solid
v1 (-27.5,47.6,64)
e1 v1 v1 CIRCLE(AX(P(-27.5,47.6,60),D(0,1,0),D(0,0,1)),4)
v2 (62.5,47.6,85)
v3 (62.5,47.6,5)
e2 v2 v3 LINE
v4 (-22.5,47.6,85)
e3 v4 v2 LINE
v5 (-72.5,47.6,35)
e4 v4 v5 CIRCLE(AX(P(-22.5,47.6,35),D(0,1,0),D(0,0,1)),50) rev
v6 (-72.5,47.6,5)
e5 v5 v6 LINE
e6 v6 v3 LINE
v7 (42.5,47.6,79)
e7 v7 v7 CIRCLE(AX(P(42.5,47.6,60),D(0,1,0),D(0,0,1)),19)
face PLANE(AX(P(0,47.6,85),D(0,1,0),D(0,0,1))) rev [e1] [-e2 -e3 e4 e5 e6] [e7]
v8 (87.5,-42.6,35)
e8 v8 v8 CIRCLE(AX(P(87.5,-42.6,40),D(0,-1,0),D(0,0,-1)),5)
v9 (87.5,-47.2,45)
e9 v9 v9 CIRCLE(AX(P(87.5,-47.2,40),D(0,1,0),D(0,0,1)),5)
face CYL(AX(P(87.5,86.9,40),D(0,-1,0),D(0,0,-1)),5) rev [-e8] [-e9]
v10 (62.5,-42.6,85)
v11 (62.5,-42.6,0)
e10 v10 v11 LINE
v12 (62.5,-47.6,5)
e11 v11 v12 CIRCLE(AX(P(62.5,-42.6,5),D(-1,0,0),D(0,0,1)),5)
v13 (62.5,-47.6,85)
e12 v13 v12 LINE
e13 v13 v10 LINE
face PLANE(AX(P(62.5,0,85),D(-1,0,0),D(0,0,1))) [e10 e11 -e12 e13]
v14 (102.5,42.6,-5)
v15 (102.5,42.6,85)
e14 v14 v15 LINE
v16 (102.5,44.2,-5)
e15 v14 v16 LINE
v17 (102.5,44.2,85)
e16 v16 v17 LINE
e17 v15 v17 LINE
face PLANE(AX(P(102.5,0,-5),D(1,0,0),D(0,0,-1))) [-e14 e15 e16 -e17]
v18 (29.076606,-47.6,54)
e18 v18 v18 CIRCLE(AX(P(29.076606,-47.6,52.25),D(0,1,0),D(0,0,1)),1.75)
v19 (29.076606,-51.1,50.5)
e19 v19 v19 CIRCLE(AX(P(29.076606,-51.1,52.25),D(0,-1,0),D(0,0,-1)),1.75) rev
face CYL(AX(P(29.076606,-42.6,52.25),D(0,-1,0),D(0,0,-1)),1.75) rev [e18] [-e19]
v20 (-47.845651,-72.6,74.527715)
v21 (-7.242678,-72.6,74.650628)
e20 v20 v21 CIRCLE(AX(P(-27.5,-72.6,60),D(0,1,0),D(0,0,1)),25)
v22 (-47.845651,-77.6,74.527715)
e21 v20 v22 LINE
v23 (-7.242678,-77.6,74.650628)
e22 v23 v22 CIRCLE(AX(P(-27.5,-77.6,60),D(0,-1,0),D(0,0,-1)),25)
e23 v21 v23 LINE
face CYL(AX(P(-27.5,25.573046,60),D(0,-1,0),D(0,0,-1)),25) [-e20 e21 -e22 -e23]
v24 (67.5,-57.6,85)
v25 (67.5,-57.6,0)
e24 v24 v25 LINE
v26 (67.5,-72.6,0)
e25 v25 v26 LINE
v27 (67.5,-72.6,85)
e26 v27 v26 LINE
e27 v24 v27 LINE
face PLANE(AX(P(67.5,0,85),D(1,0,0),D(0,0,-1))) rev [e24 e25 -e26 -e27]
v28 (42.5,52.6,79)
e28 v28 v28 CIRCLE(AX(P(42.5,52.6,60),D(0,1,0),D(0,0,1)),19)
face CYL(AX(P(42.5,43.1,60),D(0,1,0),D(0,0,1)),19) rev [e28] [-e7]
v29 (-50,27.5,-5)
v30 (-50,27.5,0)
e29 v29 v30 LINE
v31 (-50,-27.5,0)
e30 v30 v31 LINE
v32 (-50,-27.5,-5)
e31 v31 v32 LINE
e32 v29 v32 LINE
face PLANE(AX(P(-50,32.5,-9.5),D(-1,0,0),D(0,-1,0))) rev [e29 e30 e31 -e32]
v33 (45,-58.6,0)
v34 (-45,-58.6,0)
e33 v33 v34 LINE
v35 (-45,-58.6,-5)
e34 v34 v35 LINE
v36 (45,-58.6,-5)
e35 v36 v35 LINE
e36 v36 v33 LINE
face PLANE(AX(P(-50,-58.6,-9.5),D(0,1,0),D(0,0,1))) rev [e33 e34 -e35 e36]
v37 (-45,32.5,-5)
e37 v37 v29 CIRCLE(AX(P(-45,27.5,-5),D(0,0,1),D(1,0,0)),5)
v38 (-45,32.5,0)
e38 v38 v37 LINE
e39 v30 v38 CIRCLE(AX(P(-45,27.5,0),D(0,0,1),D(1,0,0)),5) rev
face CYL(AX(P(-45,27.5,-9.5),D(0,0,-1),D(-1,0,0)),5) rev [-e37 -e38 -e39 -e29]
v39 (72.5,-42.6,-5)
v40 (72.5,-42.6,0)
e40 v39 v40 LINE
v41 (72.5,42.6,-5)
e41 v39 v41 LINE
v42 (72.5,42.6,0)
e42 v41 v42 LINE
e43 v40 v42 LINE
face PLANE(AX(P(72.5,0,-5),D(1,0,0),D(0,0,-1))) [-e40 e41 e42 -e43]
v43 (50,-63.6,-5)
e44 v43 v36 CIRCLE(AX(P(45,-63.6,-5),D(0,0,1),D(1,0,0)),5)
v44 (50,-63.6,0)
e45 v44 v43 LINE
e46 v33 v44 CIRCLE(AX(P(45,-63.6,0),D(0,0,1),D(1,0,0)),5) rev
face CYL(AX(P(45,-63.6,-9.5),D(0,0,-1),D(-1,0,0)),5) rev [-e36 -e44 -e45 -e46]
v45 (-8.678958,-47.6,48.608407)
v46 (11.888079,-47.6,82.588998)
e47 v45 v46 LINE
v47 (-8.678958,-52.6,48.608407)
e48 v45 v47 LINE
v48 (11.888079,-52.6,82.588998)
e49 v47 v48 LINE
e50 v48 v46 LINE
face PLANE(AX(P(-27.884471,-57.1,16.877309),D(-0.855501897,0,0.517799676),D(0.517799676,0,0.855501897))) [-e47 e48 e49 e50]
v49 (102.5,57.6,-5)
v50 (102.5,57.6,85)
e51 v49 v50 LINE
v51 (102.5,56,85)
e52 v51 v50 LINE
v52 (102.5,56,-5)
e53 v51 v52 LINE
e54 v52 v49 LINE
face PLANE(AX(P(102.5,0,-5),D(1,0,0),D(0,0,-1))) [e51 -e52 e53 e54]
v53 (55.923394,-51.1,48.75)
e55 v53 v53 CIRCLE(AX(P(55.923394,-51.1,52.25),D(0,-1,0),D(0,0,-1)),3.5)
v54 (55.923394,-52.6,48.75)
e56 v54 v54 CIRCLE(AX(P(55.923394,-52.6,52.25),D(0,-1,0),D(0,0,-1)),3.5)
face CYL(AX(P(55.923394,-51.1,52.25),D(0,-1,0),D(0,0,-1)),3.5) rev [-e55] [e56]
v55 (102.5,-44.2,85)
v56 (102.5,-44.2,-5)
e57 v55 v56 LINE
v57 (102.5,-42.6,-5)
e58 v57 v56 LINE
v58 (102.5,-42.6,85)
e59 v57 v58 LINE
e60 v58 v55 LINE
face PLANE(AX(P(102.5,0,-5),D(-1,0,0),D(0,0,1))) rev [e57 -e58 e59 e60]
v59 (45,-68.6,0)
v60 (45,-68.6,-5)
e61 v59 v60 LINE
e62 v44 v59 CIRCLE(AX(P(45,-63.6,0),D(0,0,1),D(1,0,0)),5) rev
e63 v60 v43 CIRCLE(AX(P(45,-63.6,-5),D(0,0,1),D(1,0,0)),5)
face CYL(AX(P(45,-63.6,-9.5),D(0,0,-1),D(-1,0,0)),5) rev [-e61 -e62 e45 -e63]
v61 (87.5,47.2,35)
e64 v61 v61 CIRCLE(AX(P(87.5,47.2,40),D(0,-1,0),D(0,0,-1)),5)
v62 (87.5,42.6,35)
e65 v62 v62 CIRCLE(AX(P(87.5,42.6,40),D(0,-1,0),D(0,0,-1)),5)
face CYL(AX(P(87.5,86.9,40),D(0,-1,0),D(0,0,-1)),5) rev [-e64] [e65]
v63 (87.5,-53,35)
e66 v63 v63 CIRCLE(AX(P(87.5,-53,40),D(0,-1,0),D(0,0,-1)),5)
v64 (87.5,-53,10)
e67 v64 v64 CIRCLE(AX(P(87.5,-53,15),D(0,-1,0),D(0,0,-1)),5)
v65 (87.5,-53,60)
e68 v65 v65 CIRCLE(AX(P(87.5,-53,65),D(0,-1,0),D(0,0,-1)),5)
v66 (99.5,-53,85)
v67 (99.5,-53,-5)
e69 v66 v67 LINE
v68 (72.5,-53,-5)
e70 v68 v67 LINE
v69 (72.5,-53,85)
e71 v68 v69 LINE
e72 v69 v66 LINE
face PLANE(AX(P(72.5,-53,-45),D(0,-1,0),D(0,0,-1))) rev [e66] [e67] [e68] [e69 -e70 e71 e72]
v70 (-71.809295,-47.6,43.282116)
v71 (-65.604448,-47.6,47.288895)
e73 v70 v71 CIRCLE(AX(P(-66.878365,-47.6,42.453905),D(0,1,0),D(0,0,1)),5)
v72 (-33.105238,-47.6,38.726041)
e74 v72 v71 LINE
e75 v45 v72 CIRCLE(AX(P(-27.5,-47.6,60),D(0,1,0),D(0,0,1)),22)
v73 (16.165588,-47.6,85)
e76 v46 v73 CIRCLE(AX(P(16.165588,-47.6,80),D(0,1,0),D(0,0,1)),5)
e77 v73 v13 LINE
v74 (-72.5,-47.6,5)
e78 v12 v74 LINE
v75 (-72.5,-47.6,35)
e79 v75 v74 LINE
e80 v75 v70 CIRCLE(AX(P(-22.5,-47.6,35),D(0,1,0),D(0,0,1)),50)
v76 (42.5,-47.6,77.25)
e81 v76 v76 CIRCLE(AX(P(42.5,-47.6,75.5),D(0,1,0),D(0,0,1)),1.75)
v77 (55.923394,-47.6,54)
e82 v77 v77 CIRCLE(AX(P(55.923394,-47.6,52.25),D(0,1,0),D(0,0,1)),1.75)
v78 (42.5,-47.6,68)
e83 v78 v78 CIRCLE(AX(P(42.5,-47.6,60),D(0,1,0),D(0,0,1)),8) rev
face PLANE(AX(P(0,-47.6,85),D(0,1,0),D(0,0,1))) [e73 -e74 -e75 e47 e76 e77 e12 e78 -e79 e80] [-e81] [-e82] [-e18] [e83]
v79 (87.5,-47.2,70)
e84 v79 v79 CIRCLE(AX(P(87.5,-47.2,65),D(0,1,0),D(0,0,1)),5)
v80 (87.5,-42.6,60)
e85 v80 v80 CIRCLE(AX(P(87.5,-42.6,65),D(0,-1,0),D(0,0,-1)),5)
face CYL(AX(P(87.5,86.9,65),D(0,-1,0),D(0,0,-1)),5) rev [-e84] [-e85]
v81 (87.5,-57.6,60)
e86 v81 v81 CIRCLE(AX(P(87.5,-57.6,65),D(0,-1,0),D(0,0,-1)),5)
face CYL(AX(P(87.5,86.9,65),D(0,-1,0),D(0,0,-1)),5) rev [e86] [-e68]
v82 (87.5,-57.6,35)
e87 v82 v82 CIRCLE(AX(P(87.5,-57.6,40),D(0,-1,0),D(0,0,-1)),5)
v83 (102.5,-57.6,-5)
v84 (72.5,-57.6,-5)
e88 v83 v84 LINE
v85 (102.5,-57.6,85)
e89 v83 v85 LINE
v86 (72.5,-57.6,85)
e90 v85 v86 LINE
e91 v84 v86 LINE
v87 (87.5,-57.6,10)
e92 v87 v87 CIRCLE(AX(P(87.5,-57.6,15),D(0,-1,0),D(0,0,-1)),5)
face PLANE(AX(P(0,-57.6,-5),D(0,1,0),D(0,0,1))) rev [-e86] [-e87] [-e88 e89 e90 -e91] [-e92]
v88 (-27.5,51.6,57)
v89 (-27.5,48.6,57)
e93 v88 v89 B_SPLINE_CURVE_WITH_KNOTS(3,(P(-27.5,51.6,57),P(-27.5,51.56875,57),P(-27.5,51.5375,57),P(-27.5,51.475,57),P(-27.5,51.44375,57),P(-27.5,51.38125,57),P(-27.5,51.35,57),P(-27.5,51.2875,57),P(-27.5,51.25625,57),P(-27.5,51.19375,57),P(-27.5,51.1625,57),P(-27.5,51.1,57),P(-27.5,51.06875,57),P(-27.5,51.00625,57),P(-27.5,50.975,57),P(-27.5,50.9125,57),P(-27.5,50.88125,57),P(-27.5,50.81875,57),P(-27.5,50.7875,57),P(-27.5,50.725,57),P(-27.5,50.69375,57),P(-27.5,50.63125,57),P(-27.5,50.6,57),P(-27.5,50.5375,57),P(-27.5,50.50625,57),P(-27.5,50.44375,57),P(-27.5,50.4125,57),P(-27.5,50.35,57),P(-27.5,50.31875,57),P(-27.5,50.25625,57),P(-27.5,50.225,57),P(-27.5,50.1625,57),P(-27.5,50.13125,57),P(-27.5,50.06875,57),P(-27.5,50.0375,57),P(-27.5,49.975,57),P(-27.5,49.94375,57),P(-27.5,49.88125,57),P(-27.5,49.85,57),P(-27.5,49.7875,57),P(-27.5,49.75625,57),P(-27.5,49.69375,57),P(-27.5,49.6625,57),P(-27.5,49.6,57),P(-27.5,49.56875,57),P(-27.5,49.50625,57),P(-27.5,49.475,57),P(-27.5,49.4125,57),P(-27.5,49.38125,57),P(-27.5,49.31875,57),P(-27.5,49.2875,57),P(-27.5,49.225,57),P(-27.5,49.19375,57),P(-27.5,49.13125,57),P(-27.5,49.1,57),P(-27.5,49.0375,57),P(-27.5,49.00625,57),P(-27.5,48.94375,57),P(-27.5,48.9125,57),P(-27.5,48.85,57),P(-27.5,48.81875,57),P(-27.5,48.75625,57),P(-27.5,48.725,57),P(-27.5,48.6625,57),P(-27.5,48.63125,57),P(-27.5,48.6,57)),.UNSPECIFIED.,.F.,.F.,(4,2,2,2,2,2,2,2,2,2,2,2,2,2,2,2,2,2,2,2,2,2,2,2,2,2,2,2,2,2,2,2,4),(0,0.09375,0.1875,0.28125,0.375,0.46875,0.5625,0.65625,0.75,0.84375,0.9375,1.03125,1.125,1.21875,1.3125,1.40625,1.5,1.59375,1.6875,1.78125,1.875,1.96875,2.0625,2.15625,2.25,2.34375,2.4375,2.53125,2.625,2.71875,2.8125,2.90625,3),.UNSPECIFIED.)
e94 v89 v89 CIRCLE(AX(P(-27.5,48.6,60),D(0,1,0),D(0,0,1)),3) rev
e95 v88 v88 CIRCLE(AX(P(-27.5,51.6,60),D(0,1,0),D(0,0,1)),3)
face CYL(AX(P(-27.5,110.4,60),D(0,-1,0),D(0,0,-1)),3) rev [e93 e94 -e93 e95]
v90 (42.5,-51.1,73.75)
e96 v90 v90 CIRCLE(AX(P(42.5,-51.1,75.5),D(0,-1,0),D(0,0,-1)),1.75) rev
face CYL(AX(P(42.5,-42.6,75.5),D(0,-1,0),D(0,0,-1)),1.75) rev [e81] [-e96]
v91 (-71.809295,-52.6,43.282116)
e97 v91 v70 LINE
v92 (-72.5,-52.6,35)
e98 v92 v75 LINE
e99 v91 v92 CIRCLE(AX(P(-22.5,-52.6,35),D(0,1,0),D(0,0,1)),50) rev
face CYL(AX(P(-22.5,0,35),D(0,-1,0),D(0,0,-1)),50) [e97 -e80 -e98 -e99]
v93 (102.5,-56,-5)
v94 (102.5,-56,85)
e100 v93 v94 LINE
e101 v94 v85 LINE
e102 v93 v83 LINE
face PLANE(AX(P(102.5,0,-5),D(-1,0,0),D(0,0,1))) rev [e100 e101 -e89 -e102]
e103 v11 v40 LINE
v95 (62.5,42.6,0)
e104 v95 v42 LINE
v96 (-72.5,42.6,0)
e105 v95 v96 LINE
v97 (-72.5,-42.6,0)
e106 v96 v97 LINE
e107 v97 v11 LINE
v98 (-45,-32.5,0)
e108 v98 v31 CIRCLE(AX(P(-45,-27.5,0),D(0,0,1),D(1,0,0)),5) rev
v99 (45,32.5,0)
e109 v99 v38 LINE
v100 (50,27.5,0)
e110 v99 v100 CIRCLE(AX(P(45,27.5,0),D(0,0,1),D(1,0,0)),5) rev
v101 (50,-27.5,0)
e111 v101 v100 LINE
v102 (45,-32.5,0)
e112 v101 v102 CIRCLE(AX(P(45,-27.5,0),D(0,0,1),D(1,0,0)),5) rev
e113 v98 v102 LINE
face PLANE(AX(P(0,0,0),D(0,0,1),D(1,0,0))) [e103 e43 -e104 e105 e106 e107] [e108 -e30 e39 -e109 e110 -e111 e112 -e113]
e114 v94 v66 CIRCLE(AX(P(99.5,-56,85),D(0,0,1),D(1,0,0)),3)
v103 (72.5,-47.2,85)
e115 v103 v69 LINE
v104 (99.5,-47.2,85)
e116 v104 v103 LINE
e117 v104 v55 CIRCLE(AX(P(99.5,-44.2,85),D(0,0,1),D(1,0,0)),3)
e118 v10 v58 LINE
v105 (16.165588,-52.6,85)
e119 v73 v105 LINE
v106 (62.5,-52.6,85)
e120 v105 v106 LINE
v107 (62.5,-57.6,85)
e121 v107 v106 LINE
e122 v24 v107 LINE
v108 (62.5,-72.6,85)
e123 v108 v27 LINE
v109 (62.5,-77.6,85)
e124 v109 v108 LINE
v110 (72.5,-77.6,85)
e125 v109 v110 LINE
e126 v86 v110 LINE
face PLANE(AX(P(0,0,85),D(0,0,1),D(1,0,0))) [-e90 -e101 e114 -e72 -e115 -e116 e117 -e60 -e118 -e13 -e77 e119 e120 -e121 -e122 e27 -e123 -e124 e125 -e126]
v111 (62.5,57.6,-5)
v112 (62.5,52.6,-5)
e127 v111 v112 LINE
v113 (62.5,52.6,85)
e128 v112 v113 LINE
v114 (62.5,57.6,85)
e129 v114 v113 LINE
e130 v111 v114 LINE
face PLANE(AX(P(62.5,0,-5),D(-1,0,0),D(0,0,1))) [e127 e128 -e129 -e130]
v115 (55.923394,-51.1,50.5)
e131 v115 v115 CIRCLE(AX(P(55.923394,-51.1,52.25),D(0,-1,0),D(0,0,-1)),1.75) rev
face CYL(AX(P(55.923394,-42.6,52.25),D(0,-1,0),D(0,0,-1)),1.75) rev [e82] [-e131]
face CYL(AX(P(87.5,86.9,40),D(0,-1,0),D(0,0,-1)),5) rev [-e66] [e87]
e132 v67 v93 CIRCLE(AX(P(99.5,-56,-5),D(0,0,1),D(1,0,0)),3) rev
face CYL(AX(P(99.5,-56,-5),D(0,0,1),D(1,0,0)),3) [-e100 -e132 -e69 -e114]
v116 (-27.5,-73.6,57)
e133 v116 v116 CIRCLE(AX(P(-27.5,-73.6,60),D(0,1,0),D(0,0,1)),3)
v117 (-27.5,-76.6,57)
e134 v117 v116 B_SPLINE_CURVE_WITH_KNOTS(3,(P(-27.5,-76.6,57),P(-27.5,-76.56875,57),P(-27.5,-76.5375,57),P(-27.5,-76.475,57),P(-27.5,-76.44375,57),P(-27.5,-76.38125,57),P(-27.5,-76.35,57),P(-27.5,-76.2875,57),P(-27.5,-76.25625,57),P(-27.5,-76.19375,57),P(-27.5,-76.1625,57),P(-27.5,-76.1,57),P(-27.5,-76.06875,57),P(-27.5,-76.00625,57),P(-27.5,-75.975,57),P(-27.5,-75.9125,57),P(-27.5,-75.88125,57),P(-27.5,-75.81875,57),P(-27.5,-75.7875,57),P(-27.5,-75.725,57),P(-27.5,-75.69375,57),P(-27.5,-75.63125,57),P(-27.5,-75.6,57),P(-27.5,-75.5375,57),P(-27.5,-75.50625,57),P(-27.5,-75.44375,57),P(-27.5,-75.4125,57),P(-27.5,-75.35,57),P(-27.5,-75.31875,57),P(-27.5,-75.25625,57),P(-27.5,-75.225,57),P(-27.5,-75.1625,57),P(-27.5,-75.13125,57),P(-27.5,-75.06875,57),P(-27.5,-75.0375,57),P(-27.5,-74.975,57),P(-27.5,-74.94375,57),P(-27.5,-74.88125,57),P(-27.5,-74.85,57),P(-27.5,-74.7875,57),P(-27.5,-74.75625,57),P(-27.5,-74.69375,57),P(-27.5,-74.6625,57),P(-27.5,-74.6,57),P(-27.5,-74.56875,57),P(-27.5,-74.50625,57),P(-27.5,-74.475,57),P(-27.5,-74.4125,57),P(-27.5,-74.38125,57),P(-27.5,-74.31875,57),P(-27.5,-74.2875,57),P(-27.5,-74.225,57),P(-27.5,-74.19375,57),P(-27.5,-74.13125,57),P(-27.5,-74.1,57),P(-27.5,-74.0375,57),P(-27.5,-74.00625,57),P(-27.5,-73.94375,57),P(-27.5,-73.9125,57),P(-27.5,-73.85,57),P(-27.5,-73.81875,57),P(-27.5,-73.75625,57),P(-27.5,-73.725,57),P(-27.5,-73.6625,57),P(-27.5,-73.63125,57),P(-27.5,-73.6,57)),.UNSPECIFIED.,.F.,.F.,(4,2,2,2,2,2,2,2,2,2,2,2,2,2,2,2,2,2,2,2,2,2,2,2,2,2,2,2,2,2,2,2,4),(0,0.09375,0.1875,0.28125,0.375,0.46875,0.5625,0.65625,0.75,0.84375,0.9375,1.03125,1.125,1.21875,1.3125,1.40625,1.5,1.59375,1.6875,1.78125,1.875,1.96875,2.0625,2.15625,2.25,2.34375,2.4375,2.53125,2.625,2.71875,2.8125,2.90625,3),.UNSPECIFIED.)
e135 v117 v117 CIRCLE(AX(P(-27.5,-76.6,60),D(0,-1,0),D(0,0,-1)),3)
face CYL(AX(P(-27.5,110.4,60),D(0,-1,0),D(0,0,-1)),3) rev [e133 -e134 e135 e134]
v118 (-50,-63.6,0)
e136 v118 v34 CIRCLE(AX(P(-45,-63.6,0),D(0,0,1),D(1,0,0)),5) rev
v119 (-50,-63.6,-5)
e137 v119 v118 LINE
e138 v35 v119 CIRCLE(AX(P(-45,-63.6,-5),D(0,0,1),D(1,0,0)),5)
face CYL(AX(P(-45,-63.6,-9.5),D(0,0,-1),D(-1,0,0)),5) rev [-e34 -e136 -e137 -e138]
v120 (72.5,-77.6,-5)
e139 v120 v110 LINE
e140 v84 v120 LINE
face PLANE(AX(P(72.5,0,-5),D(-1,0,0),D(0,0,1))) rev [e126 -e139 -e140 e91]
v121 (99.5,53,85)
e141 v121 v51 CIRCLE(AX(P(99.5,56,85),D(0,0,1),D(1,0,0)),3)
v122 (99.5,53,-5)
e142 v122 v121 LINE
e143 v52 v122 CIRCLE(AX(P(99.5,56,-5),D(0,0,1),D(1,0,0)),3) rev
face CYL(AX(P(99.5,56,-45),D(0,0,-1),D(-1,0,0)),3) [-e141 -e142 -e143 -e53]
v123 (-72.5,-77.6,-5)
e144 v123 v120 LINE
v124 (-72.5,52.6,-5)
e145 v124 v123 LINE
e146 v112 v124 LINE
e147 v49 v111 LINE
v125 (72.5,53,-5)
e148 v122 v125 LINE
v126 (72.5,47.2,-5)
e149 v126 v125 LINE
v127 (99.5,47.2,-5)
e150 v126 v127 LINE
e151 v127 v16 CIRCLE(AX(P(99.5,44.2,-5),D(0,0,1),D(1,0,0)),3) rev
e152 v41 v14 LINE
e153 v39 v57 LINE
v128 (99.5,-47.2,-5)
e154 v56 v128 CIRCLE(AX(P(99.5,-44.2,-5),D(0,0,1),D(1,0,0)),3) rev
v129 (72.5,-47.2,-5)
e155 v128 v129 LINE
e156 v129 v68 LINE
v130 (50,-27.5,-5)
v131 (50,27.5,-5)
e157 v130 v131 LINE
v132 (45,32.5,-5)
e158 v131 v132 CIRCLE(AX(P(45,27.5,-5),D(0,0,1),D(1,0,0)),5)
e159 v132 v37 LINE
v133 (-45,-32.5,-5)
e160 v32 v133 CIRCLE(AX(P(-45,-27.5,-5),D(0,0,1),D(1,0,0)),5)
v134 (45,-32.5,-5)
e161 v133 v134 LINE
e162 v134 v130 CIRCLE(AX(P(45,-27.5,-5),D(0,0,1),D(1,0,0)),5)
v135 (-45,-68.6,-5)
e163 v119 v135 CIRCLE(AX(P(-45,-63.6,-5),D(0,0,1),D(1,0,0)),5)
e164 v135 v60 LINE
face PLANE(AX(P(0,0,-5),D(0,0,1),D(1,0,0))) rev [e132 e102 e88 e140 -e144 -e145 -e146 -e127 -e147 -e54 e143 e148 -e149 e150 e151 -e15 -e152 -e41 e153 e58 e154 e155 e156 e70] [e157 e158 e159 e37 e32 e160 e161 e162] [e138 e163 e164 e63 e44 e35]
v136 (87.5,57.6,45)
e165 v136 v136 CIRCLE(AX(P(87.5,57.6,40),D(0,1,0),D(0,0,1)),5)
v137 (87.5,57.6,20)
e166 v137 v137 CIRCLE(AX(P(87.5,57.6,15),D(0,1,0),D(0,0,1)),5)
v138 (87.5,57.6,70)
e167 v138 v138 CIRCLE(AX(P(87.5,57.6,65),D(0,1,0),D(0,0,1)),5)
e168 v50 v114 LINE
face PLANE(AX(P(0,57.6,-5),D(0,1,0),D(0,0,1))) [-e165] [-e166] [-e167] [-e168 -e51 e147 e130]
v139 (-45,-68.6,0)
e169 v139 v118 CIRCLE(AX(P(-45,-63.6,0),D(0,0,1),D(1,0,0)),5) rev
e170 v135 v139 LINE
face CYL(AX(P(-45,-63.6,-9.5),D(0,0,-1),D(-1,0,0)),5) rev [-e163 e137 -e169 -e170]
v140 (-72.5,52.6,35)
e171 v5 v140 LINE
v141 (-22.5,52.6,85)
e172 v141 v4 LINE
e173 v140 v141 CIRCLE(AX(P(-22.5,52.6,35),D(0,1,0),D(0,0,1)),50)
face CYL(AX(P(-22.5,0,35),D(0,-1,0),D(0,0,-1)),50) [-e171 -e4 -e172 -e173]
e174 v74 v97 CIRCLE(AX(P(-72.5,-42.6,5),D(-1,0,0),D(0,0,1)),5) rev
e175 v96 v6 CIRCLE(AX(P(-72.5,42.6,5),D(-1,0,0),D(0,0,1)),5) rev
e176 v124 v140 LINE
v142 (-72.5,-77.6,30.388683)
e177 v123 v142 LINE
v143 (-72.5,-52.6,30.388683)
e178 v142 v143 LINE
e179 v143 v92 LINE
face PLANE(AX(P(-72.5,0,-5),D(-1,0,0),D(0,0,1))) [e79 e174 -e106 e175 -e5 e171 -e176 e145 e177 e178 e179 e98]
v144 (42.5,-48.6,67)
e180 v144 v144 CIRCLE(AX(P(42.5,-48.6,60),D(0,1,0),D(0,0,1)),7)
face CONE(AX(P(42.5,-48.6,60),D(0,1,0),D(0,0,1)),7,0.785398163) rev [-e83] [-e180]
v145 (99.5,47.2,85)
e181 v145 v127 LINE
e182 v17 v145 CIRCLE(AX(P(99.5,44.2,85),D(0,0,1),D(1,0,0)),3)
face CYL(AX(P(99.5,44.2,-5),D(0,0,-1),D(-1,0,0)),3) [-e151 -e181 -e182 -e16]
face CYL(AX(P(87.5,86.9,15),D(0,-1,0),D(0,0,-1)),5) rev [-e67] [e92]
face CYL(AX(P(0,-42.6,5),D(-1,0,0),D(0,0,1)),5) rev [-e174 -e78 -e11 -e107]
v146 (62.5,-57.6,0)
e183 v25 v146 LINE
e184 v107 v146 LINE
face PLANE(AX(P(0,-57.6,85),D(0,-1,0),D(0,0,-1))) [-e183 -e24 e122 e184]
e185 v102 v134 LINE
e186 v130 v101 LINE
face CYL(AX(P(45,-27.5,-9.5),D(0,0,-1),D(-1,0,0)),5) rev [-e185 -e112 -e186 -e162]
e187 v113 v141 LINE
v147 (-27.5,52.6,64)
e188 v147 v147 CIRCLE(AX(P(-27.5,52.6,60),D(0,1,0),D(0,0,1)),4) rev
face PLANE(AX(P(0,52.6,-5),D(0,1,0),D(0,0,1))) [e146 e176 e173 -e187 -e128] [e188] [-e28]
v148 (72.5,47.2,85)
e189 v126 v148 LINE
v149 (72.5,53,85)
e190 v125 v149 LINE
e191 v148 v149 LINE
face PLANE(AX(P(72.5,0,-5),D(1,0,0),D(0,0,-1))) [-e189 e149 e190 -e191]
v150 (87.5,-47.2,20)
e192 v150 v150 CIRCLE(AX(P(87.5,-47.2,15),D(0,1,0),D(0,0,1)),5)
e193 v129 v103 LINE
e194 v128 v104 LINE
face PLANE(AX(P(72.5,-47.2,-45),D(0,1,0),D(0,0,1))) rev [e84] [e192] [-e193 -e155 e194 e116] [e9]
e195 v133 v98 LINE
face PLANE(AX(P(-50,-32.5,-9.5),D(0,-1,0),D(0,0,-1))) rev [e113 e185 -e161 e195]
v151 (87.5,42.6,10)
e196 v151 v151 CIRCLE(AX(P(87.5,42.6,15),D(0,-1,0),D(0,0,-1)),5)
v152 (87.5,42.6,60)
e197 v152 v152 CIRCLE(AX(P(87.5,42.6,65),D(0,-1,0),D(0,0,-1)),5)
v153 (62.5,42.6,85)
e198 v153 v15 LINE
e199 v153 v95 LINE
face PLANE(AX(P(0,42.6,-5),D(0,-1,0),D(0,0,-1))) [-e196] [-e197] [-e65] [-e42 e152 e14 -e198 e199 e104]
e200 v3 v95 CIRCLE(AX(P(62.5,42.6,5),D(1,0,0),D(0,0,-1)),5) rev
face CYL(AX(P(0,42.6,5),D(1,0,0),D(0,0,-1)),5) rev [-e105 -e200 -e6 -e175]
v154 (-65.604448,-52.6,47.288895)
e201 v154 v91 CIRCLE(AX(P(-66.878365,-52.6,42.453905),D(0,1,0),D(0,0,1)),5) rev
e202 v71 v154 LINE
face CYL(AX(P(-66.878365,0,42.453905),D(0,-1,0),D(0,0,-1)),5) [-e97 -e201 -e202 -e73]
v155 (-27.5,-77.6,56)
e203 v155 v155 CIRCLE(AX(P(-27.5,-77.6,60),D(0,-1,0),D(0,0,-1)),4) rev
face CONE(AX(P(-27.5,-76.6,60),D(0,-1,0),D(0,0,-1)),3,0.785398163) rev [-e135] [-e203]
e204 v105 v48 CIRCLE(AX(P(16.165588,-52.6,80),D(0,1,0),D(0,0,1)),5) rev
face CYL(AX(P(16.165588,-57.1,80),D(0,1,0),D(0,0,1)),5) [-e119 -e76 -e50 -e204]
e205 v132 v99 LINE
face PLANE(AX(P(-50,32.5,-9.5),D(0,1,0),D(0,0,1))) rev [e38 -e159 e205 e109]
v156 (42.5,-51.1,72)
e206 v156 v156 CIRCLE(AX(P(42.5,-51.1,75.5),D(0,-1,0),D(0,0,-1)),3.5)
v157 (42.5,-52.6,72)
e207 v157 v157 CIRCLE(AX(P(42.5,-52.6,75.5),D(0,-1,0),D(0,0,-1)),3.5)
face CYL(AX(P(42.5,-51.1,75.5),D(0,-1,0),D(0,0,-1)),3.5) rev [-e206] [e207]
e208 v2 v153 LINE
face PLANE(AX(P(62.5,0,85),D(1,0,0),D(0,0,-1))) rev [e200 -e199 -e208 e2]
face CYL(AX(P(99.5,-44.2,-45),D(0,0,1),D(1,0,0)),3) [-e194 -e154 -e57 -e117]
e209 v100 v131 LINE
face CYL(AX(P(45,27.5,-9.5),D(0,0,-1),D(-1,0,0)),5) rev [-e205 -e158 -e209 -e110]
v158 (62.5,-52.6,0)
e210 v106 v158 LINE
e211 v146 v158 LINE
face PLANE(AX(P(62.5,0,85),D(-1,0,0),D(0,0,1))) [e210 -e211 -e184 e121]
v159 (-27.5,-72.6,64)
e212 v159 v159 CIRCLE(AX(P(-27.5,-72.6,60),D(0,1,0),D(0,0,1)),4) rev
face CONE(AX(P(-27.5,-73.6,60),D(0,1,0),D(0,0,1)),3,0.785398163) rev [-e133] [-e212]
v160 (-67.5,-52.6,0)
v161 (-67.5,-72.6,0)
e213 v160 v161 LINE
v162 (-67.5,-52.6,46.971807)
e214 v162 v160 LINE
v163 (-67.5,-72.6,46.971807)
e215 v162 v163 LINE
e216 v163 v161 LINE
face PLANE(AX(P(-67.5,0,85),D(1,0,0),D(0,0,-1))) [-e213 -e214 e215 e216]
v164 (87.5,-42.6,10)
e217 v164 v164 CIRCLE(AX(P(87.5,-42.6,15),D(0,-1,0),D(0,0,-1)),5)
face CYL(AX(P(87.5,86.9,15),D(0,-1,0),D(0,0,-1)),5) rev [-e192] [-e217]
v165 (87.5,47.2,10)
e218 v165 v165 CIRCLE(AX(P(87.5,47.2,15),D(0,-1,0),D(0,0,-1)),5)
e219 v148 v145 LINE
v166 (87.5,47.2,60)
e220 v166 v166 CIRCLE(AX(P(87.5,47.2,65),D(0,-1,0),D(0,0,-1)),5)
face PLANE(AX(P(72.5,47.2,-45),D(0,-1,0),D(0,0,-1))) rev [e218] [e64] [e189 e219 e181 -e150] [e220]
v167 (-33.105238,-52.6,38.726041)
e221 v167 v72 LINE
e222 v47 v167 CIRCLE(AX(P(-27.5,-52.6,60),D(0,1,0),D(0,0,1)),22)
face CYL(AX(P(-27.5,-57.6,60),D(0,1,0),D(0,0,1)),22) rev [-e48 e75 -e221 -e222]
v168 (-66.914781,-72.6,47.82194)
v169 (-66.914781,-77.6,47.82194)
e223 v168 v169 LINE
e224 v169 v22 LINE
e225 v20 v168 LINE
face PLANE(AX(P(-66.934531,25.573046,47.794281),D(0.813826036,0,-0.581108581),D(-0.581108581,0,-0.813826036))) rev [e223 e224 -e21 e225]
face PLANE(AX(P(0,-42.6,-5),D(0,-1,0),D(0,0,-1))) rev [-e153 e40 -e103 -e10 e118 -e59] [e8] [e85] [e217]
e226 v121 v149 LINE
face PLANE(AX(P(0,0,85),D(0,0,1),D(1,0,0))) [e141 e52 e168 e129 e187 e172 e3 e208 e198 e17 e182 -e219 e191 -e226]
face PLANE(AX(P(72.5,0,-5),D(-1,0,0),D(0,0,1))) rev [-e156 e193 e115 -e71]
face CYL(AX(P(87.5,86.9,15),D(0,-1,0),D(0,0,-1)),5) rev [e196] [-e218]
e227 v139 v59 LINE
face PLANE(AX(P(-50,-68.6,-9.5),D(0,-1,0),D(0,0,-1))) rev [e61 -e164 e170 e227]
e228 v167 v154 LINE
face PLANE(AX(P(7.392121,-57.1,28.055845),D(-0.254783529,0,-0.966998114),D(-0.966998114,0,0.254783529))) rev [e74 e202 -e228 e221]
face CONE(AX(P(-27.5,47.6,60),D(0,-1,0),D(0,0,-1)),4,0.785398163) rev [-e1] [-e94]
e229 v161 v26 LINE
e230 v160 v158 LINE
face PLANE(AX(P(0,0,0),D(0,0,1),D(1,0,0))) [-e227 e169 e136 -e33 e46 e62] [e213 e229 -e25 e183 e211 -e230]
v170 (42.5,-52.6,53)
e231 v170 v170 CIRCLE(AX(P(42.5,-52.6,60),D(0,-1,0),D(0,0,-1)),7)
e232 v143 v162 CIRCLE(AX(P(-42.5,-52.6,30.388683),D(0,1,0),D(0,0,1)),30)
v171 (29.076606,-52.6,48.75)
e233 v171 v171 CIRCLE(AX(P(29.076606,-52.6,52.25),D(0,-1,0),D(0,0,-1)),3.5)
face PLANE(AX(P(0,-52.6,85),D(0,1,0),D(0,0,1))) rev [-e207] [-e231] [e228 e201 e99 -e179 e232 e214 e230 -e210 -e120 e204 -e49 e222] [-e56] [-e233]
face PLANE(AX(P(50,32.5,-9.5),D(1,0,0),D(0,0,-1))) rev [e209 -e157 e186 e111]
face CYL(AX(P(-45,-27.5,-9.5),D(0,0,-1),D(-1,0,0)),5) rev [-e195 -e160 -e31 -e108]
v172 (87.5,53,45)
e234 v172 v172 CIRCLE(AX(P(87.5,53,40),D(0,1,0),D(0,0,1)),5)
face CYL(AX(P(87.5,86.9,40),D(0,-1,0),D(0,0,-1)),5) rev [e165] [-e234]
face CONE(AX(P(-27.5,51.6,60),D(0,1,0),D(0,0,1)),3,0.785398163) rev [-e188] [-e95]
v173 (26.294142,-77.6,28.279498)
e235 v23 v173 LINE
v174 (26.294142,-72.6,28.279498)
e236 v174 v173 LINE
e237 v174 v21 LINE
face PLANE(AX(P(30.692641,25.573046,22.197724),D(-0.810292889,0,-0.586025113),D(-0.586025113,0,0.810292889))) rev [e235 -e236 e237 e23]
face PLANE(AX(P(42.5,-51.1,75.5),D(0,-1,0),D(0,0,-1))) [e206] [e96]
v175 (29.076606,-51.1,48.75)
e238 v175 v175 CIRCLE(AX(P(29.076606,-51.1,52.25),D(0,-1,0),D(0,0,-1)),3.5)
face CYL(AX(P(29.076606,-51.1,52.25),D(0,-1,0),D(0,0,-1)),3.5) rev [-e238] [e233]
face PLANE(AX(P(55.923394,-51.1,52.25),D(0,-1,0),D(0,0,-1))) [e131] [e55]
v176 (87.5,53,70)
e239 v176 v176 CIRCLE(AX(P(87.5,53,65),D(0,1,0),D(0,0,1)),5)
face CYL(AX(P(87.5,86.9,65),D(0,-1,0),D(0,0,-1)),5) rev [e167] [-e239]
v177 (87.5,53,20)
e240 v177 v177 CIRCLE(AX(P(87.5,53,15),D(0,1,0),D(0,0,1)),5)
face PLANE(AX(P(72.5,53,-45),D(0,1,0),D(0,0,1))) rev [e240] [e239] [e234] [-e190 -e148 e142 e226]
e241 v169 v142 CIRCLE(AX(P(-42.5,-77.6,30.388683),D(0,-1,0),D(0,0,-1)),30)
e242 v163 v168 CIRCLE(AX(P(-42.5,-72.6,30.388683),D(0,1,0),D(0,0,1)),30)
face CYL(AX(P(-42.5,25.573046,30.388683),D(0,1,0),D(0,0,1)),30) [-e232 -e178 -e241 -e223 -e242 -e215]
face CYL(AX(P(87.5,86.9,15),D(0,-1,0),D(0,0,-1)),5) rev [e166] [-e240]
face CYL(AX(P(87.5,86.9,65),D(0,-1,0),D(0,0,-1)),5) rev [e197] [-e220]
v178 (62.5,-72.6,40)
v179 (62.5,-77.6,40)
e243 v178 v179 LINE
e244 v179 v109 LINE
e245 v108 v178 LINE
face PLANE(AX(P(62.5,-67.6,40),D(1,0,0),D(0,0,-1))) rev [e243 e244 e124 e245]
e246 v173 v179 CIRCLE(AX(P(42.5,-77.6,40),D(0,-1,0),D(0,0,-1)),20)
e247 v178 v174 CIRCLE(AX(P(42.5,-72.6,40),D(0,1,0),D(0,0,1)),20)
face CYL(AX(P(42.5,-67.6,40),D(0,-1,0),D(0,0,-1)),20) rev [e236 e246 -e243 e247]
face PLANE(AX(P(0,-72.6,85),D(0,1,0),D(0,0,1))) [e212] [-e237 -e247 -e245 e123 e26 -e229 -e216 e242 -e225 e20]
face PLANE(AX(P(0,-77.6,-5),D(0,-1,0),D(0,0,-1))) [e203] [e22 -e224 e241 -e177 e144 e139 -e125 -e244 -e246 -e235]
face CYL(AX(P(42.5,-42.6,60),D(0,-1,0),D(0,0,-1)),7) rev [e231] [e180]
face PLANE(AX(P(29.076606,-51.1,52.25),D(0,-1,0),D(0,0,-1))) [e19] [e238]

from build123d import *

# Parameters (mm, degrees)
SKETCH_1_W               = 145
SKETCH_1_H               = 5
EXTRUDE_1_DEPTH          = 5
SKETCH_1_3_W             = 145
SKETCH_1_3_H             = 5
EXTRUDE_2_DEPTH          = 85
SKETCH_2_W               = 30
SKETCH_2_H               = 5.8
CUT_EXTRUDE_1_DEPTH      = 130
SKETCH_3_R               = 3
CUT_EXTRUDE_2_DEPTH      = 188
SKETCH_4_R               = 22
CUT_EXTRUDE_3_DEPTH      = 10
CUT_EXTRUDE_4_DEPTH      = 10
SKETCH_6_R               = 7
SKETCH_6_R_2             = 1.75
CUT_EXTRUDE_5_DEPTH      = 10
SKETCH_7_R               = 3.5
CUT_EXTRUDE_6_DEPTH      = 1.5
CUT_EXTRUDE_7_REACH      = 191.764
FILLET_2_R               = 50
FILLET_3_R               = 30
SKETCH_9_R               = 19
CUT_EXTRUDE_8_DEPTH      = 9.5
FILLET_4_R               = 3
SKETCH_10_W              = 100
SKETCH_10_H              = 65
SKETCH_10_H_2            = 10
CUT_EXTRUDE_9_DEPTH      = 9.5
CUT_EXTRUDE_START        = -52.6
CUT_EXTRUDE_10_DEPTH     = 5
FILLET_5_R               = 5
FILLET_6_R               = 5
FILLET_7_R               = 5
CUT_EXTRUDE_START_2      = -57.6
CUT_EXTRUDE_11_OUTLINE_R = 5
CUT_EXTRUDE_11_DEPTH     = 115.2
CHAMFER_1_SIZE           = 1


# Read off the part's stored shape, not the designer's step: 컷-돌출10, 컷-돌출11
# Some blends are built 0.0001 mm under size
with BuildPart() as part:
    # 스케치1 → 보스-돌출1 (new body)
    with BuildSketch(Plane.XY):
        with Locations((0, 50.1)):
            Rectangle(SKETCH_1_W, SKETCH_1_H)
        Polygon((-12.5, -47.6), (62.5, -47.6), (62.5, -42.6), (72.5, -42.6), (72.5, 42.6), (62.5, 42.6), (62.5, 47.6), (-72.5, 47.6), (-72.5, -47.6), (-67.5, -47.6), (-52.5, -47.6), align=None)
        Polygon((72.5, -47.6), (67.5, -47.6), (62.5, -47.6), (-12.5, -47.6), (-52.5, -47.6), (-67.5, -47.6), (-72.5, -47.6), (-72.5, -77.6), (-67.5, -77.6), (67.5, -77.6), (72.5, -77.6), (72.5, -57.6), (67.5, -57.6), (67.5, -72.6), (-67.5, -72.6), (-67.5, -52.6), (62.5, -52.6), (67.5, -52.6), (72.5, -52.6), align=None)
        Polygon((62.5, -57.6), (62.5, -52.6), (-67.5, -52.6), (-67.5, -72.6), (67.5, -72.6), (67.5, -57.6), align=None)
        Polygon((62.5, 42.6), (72.5, 42.6), (102.5, 42.6), (102.5, 47.6), (72.5, 47.6), (62.5, 47.6), align=None)
        Polygon((62.5, 57.6), (62.5, 52.6), (72.5, 52.6), (102.5, 52.6), (102.5, 57.6), align=None)
        Polygon((62.5, -47.6), (67.5, -47.6), (72.5, -47.6), (102.5, -47.6), (102.5, -42.6), (72.5, -42.6), (62.5, -42.6), align=None)
        Polygon((102.5, -52.6), (72.5, -52.6), (67.5, -52.6), (62.5, -52.6), (62.5, -57.6), (67.5, -57.6), (72.5, -57.6), (102.5, -57.6), align=None)
    extrude(amount=-EXTRUDE_1_DEPTH)

    # 스케치1<3> → 보스-돌출2 (add)
    with BuildSketch(Plane.XY):
        with Locations((0, 50.1)):
            Rectangle(SKETCH_1_3_W, SKETCH_1_3_H)
        Polygon((72.5, -47.6), (67.5, -47.6), (62.5, -47.6), (-12.5, -47.6), (-52.5, -47.6), (-67.5, -47.6), (-72.5, -47.6), (-72.5, -77.6), (-67.5, -77.6), (67.5, -77.6), (72.5, -77.6), (72.5, -57.6), (67.5, -57.6), (67.5, -72.6), (-67.5, -72.6), (-67.5, -52.6), (62.5, -52.6), (67.5, -52.6), (72.5, -52.6), align=None)
        Polygon((102.5, -52.6), (72.5, -52.6), (67.5, -52.6), (62.5, -52.6), (62.5, -57.6), (67.5, -57.6), (72.5, -57.6), (102.5, -57.6), align=None)
        Polygon((62.5, -47.6), (67.5, -47.6), (72.5, -47.6), (102.5, -47.6), (102.5, -42.6), (72.5, -42.6), (62.5, -42.6), align=None)
        Polygon((62.5, 42.6), (72.5, 42.6), (102.5, 42.6), (102.5, 47.6), (72.5, 47.6), (62.5, 47.6), align=None)
        Polygon((62.5, 57.6), (62.5, 52.6), (72.5, 52.6), (102.5, 52.6), (102.5, 57.6), align=None)
    extrude(amount=EXTRUDE_2_DEPTH)

    # 스케치2 → 컷-돌출1 (cut)
    with BuildSketch(Plane.XY.offset(85)):
        with Locations((87.5, -50.1)):
            Rectangle(SKETCH_2_W, SKETCH_2_H)
        with Locations((87.5, 50.1)):
            Rectangle(SKETCH_2_W, SKETCH_2_H)
    extrude(amount=-CUT_EXTRUDE_1_DEPTH, mode=Mode.SUBTRACT)

    # 스케치3 → 컷-돌출2 (cut)
    with BuildSketch(Plane.XZ.offset(77.6)):
        with Locations(Location((-27.5, 60, 0), (0, 0, 270))):
            Circle(SKETCH_3_R)
        with Locations(Location((42.5, 60, 0), (0, 0, 270))):
            Circle(SKETCH_3_R)
    extrude(amount=-CUT_EXTRUDE_2_DEPTH, mode=Mode.SUBTRACT)

    # 스케치4 → 컷-돌출3 (cut)
    with BuildSketch(Plane(origin=(0, -47.6, 0), x_dir=(1, 0, 0), z_dir=(0, 1, 0))):
        with Locations(Location((-27.5, -60, 0), (0, 0, 270))):
            Circle(SKETCH_4_R)
    extrude(amount=-CUT_EXTRUDE_3_DEPTH, mode=Mode.SUBTRACT)

    # 스케치5 → 컷-돌출4 (cut)
    with BuildSketch(Plane.XZ.offset(77.6)):
        with BuildLine():
            Line((22.5, 40), (22.5, 143.403110926))
            ThreePointArc((22.5, 143.403110926), (42.5, 163.403110926), (62.5, 143.403110926))
            Line((62.5, 143.403110926), (62.5, 40))
            ThreePointArc((62.5, 40), (42.5, 20), (22.5, 40))
        make_face()
    extrude(amount=-CUT_EXTRUDE_4_DEPTH, mode=Mode.SUBTRACT)

    # 스케치6 → 컷-돌출5 (cut)
    with BuildSketch(Plane.XZ.offset(52.6)):
        with Locations(Location((42.5, 60, 0), (0, 0, 270))):
            Circle(SKETCH_6_R)
        with Locations(Location((42.5, 75.5, 0), (0, 0, 270))):
            Circle(SKETCH_6_R_2)
        with Locations(Location((55.923393759, 52.25, 0), (0, 0, 270))):
            Circle(SKETCH_6_R_2)
        with Locations(Location((29.076606241, 52.25, 0), (0, 0, 270))):
            Circle(SKETCH_6_R_2)
    extrude(amount=-CUT_EXTRUDE_5_DEPTH, mode=Mode.SUBTRACT)

    # 스케치7 → 컷-돌출6 (cut)
    with BuildSketch(Plane.XZ.offset(52.6)):
        with Locations(Location((42.5, 75.5, 0), (0, 0, 270))):
            Circle(SKETCH_7_R)
        with Locations(Location((29.076606241, 52.25, 0), (0, 0, 270))):
            Circle(SKETCH_7_R)
        with Locations(Location((55.923393759, 52.25, 0), (0, 0, 270))):
            Circle(SKETCH_7_R)
    extrude(amount=-CUT_EXTRUDE_6_DEPTH, mode=Mode.SUBTRACT)

    # 컷-돌출7: up to this face of the body (flat: up to its plane)
    cut_extrude_7_end = Plane(part.part.faces().sort_by_distance((0.295943146, -52.6, 39.117345593))[0])
    # 스케치8 → 컷-돌출7 (cut, up to the picked face)
    with BuildSketch(Plane.XZ.offset(77.6), mode=Mode.PRIVATE) as cut_extrude_7_sk1:
        with BuildLine():
            ThreePointArc((-47.845650901, 74.527714528), (-38.941309623, 82.228280053), (-27.499999753, 85))
            Line((-27.499999753, 85), (-72.5, 85))
            Line((-72.5, 85), (-72.5, 40))
            Line((-72.5, 40), (-47.845650901, 74.527714528))
        make_face()
    cut_extrude_7_tool1 = split(extrude(cut_extrude_7_sk1.sketch, amount=-CUT_EXTRUDE_7_REACH, mode=Mode.PRIVATE), bisect_by=cut_extrude_7_end, keep=Keep.BOTH, mode=Mode.PRIVATE)
    # 스케치8 → 컷-돌출7 (cut, up to the picked face)
    with BuildSketch(Plane.XZ.offset(77.6), mode=Mode.PRIVATE) as cut_extrude_7_sk2:
        with BuildLine():
            ThreePointArc((-27.499999753, 85), (-16.126031711, 82.26281306), (-7.242677763, 74.650627829))
            Line((-7.242677763, 74.650627829), (26.29414221, 28.279497737))
            ThreePointArc((26.29414221, 28.279497737), (23.472163079, 33.840339124), (22.5, 40))
            Line((22.5, 40), (22.5, 85))
            Line((22.5, 85), (-27.499999753, 85))
        make_face()
    cut_extrude_7_tool2 = split(extrude(cut_extrude_7_sk2.sketch, amount=-CUT_EXTRUDE_7_REACH, mode=Mode.PRIVATE), bisect_by=cut_extrude_7_end, keep=Keep.BOTH, mode=Mode.PRIVATE)
    add(cut_extrude_7_tool1.solids().sort_by(Axis((-61.047418, -77.6, 70.421968), (0, 1, 0)))[0], mode=Mode.SUBTRACT)
    add(cut_extrude_7_tool2.solids().sort_by(Axis((9.51437, -77.6, 68.061513), (0, 1, 0)))[0], mode=Mode.SUBTRACT)

    # 필렛2
    # the kernel refuses this fillet: 50 mm, written as the material it takes off along each edge
    with BuildSketch(Plane(origin=(-72.5, 77.4, 85), x_dir=(1, 0, 0), z_dir=(0, -1, 0))) as fillet_2_piece_1_section:
        with BuildLine():
            CenterArc((FILLET_2_R, -FILLET_2_R), FILLET_2_R, 90, 90)
            Line((0, -FILLET_2_R), (0, 0))
            Line((0, 0), (FILLET_2_R, 0))
        make_face()
    fillet_2_piece_1 = extrude(amount=255, mode=Mode.PRIVATE)
    fillet_2_piece_1 = split(fillet_2_piece_1, bisect_by=Plane(origin=(-25.214622506, -72.6, 84.974238143), z_dir=(0, 1, 0)), keep=Keep.TOP, mode=Mode.PRIVATE)
    add(fillet_2_piece_1, mode=Mode.SUBTRACT)
    with BuildSketch(Plane(origin=(-72.5, 77.4, 85), x_dir=(1, 0, 0), z_dir=(0, -1, 0))) as fillet_2_piece_2_section:
        with BuildLine():
            CenterArc((FILLET_2_R, -FILLET_2_R), FILLET_2_R, 90, 90)
            Line((0, -FILLET_2_R), (0, 0))
            Line((0, 0), (FILLET_2_R, 0))
        make_face()
    fillet_2_piece_2 = extrude(amount=255, mode=Mode.PRIVATE)
    fillet_2_piece_2 = fillet_2_piece_2 - Plane(origin=(-27.5, -75.1, 60), x_dir=(-0.8138260360510762, 0, 0.5811085811149175), z_dir=(0, -1, 0)) * Cylinder(25, 710, mode=Mode.PRIVATE)
    add(fillet_2_piece_2, mode=Mode.SUBTRACT)
    with BuildSketch(Plane(origin=(-72.5, 177.6, 85), x_dir=(1, 0, 0), z_dir=(0, -1, 0))) as fillet_2_piece_3_section:
        with BuildLine():
            CenterArc((FILLET_2_R, -FILLET_2_R), FILLET_2_R, 90, 90)
            Line((0, -FILLET_2_R), (0, 0))
            Line((0, 0), (FILLET_2_R, 0))
        make_face()
    fillet_2_piece_3 = extrude(amount=255, mode=Mode.PRIVATE)
    fillet_2_piece_3 = split(fillet_2_piece_3, bisect_by=Plane(origin=(-25.214622506, -72.6, 84.974238143), z_dir=(0, 1, 0)), keep=Keep.TOP, mode=Mode.PRIVATE)
    add(fillet_2_piece_3, mode=Mode.SUBTRACT)
    with BuildSketch(Plane(origin=(-72.5, 177.6, 85), x_dir=(1, 0, 0), z_dir=(0, -1, 0))) as fillet_2_piece_4_section:
        with BuildLine():
            CenterArc((FILLET_2_R, -FILLET_2_R), FILLET_2_R, 90, 90)
            Line((0, -FILLET_2_R), (0, 0))
            Line((0, 0), (FILLET_2_R, 0))
        make_face()
    fillet_2_piece_4 = extrude(amount=255, mode=Mode.PRIVATE)
    fillet_2_piece_4 = fillet_2_piece_4 - Plane(origin=(-27.5, -75, 60), x_dir=(-0.8138260360510762, 0, 0.5811085811149175), z_dir=(0, -1, 0)) * Cylinder(25, 711, mode=Mode.PRIVATE)
    add(fillet_2_piece_4, mode=Mode.SUBTRACT)

    # 필렛3
    # the kernel refuses this fillet: 30 mm, written as the material it takes off along each edge
    with BuildSketch(Plane(origin=(-72.206316289, -102.667286914, 40.411295682), x_dir=(-0.02928953897297379, 0, -0.999570969419756), z_dir=(0, 1, 0))) as fillet_3_piece_1:
        with BuildLine():
            CenterArc((9.148228596, -29.987129083), FILLET_3_R, 88.321592997, 35.528552159)
            Line((-7.562451754, -5.072210616), (-9.23351979, -2.580718769))
            Line((-9.23351979, -2.580718769), (-1.671068035, 2.491491847))
            Line((-1.671068035, 2.491491847), (-0.237185939, 2.990609107))
            ThreePointArc((-0.237185939, 2.990609107), (5.505444548, 3.133776264), (10.114783383, 2.998712908))
            Line((10.114783383, 2.998712908), (10.026914766, 0))
        make_face()
    extrude(amount=50.067286914, mode=Mode.SUBTRACT)

    # 스케치9 → 컷-돌출8 (cut)
    with BuildSketch(Plane(origin=(0, 52.6, 0), x_dir=(1, 0, 0), z_dir=(0, 1, 0))):
        with Locations(Location((42.5, -60, 0), (0, 0, 270))):
            Circle(SKETCH_9_R)
    extrude(amount=-CUT_EXTRUDE_8_DEPTH, mode=Mode.SUBTRACT)

    # 필렛4
    fillet_4_edges = [part.edges().sort_by_distance(p)[0] for p in [
        (102.5, -47.2, 40),
        (102.5, -53, 40),
        (102.5, 53, 40),
        (102.5, 47.2, 40),
    ]]
    fillet(fillet_4_edges, radius=FILLET_4_R)

    # 스케치10 → 컷-돌출9 (cut)
    with BuildSketch(Plane.XY):
        Rectangle(SKETCH_10_W, SKETCH_10_H)
        with Locations((0, -63.6)):
            Rectangle(SKETCH_10_W, SKETCH_10_H_2)
    extrude(amount=-CUT_EXTRUDE_9_DEPTH, mode=Mode.SUBTRACT)

    # 컷-돌출10 outline → 컷-돌출10 (cut)
    with BuildSketch(Plane(origin=(0, 0, 0), x_dir=(1, 0, 0), z_dir=(0, 1, 0)).offset(CUT_EXTRUDE_START)):
        with BuildLine():
            ThreePointArc((-8.678958263, -48.608407139), (-35.751039768, -80.394125202), (-33.105237637, -38.726041482))
            Line((-33.105237637, -38.726041482), (-70.612485439, -48.608407139))
            ThreePointArc((-70.612485439, -48.608407139), (-52.662722382, -74.877439467), (-22.5, -85))
            Line((-22.5, -85), (13.347357562, -85))
            Line((13.347357562, -85), (-8.678958263, -48.608407139))
        make_face()
    extrude(amount=CUT_EXTRUDE_10_DEPTH, mode=Mode.SUBTRACT)

    # 필렛5
    fillet_5_edges = [part.edges().sort_by_distance(p)[0] for p in [
        (-70.612485439, -50.1, 48.608407139),
        (13.347357562, -50.1, 85),
    ]]
    fillet(fillet_5_edges, radius=FILLET_5_R)

    # 필렛6
    fillet_6_edges = [part.edges().sort_by_distance(p)[0] for p in [
        (50, 32.5, -2.5),
        (50, -32.5, -2.5),
        (-50, -32.5, -2.5),
        (-50, 32.5, -2.5),
        (50, -58.6, -2.5),
        (50, -68.6, -2.5),
        (-50, -68.6, -2.5),
        (-50, -58.6, -2.5),
    ]]
    fillet(fillet_6_edges, radius=FILLET_6_R - 0.0001)  # a hair under: the kernel refuses the full size

    # 필렛7
    fillet_7_edges = [part.edges().sort_by_distance(p)[0] for p in [
        (-5, -47.6, 0),
        (-5, 47.6, 0),
    ]]
    fillet(fillet_7_edges, radius=FILLET_7_R)

    # 컷-돌출11 outline → 컷-돌출11 (cut)
    with BuildSketch(Plane(origin=(0, 0, 0), x_dir=(1, 0, 0), z_dir=(0, 1, 0)).offset(CUT_EXTRUDE_START_2)):
        with Locations((87.5, -15)):
            Circle(CUT_EXTRUDE_11_OUTLINE_R)
        with Locations((87.5, -40)):
            Circle(CUT_EXTRUDE_11_OUTLINE_R)
        with Locations((87.5, -65)):
            Circle(CUT_EXTRUDE_11_OUTLINE_R)
    extrude(amount=CUT_EXTRUDE_11_DEPTH, mode=Mode.SUBTRACT)

    # 모따기1
    chamfer_1_edges = [part.edges().sort_by_distance(p)[0] for p in [
        (-27.5, 52.6, 63),
        (-27.5, -72.6, 63),
        (-27.5, 47.6, 63),
        (-27.5, -77.6, 63),
        (42.5, -47.6, 67),
    ]]
    chamfer(chamfer_1_edges, length=CHAMFER_1_SIZE)


solid = part.part
